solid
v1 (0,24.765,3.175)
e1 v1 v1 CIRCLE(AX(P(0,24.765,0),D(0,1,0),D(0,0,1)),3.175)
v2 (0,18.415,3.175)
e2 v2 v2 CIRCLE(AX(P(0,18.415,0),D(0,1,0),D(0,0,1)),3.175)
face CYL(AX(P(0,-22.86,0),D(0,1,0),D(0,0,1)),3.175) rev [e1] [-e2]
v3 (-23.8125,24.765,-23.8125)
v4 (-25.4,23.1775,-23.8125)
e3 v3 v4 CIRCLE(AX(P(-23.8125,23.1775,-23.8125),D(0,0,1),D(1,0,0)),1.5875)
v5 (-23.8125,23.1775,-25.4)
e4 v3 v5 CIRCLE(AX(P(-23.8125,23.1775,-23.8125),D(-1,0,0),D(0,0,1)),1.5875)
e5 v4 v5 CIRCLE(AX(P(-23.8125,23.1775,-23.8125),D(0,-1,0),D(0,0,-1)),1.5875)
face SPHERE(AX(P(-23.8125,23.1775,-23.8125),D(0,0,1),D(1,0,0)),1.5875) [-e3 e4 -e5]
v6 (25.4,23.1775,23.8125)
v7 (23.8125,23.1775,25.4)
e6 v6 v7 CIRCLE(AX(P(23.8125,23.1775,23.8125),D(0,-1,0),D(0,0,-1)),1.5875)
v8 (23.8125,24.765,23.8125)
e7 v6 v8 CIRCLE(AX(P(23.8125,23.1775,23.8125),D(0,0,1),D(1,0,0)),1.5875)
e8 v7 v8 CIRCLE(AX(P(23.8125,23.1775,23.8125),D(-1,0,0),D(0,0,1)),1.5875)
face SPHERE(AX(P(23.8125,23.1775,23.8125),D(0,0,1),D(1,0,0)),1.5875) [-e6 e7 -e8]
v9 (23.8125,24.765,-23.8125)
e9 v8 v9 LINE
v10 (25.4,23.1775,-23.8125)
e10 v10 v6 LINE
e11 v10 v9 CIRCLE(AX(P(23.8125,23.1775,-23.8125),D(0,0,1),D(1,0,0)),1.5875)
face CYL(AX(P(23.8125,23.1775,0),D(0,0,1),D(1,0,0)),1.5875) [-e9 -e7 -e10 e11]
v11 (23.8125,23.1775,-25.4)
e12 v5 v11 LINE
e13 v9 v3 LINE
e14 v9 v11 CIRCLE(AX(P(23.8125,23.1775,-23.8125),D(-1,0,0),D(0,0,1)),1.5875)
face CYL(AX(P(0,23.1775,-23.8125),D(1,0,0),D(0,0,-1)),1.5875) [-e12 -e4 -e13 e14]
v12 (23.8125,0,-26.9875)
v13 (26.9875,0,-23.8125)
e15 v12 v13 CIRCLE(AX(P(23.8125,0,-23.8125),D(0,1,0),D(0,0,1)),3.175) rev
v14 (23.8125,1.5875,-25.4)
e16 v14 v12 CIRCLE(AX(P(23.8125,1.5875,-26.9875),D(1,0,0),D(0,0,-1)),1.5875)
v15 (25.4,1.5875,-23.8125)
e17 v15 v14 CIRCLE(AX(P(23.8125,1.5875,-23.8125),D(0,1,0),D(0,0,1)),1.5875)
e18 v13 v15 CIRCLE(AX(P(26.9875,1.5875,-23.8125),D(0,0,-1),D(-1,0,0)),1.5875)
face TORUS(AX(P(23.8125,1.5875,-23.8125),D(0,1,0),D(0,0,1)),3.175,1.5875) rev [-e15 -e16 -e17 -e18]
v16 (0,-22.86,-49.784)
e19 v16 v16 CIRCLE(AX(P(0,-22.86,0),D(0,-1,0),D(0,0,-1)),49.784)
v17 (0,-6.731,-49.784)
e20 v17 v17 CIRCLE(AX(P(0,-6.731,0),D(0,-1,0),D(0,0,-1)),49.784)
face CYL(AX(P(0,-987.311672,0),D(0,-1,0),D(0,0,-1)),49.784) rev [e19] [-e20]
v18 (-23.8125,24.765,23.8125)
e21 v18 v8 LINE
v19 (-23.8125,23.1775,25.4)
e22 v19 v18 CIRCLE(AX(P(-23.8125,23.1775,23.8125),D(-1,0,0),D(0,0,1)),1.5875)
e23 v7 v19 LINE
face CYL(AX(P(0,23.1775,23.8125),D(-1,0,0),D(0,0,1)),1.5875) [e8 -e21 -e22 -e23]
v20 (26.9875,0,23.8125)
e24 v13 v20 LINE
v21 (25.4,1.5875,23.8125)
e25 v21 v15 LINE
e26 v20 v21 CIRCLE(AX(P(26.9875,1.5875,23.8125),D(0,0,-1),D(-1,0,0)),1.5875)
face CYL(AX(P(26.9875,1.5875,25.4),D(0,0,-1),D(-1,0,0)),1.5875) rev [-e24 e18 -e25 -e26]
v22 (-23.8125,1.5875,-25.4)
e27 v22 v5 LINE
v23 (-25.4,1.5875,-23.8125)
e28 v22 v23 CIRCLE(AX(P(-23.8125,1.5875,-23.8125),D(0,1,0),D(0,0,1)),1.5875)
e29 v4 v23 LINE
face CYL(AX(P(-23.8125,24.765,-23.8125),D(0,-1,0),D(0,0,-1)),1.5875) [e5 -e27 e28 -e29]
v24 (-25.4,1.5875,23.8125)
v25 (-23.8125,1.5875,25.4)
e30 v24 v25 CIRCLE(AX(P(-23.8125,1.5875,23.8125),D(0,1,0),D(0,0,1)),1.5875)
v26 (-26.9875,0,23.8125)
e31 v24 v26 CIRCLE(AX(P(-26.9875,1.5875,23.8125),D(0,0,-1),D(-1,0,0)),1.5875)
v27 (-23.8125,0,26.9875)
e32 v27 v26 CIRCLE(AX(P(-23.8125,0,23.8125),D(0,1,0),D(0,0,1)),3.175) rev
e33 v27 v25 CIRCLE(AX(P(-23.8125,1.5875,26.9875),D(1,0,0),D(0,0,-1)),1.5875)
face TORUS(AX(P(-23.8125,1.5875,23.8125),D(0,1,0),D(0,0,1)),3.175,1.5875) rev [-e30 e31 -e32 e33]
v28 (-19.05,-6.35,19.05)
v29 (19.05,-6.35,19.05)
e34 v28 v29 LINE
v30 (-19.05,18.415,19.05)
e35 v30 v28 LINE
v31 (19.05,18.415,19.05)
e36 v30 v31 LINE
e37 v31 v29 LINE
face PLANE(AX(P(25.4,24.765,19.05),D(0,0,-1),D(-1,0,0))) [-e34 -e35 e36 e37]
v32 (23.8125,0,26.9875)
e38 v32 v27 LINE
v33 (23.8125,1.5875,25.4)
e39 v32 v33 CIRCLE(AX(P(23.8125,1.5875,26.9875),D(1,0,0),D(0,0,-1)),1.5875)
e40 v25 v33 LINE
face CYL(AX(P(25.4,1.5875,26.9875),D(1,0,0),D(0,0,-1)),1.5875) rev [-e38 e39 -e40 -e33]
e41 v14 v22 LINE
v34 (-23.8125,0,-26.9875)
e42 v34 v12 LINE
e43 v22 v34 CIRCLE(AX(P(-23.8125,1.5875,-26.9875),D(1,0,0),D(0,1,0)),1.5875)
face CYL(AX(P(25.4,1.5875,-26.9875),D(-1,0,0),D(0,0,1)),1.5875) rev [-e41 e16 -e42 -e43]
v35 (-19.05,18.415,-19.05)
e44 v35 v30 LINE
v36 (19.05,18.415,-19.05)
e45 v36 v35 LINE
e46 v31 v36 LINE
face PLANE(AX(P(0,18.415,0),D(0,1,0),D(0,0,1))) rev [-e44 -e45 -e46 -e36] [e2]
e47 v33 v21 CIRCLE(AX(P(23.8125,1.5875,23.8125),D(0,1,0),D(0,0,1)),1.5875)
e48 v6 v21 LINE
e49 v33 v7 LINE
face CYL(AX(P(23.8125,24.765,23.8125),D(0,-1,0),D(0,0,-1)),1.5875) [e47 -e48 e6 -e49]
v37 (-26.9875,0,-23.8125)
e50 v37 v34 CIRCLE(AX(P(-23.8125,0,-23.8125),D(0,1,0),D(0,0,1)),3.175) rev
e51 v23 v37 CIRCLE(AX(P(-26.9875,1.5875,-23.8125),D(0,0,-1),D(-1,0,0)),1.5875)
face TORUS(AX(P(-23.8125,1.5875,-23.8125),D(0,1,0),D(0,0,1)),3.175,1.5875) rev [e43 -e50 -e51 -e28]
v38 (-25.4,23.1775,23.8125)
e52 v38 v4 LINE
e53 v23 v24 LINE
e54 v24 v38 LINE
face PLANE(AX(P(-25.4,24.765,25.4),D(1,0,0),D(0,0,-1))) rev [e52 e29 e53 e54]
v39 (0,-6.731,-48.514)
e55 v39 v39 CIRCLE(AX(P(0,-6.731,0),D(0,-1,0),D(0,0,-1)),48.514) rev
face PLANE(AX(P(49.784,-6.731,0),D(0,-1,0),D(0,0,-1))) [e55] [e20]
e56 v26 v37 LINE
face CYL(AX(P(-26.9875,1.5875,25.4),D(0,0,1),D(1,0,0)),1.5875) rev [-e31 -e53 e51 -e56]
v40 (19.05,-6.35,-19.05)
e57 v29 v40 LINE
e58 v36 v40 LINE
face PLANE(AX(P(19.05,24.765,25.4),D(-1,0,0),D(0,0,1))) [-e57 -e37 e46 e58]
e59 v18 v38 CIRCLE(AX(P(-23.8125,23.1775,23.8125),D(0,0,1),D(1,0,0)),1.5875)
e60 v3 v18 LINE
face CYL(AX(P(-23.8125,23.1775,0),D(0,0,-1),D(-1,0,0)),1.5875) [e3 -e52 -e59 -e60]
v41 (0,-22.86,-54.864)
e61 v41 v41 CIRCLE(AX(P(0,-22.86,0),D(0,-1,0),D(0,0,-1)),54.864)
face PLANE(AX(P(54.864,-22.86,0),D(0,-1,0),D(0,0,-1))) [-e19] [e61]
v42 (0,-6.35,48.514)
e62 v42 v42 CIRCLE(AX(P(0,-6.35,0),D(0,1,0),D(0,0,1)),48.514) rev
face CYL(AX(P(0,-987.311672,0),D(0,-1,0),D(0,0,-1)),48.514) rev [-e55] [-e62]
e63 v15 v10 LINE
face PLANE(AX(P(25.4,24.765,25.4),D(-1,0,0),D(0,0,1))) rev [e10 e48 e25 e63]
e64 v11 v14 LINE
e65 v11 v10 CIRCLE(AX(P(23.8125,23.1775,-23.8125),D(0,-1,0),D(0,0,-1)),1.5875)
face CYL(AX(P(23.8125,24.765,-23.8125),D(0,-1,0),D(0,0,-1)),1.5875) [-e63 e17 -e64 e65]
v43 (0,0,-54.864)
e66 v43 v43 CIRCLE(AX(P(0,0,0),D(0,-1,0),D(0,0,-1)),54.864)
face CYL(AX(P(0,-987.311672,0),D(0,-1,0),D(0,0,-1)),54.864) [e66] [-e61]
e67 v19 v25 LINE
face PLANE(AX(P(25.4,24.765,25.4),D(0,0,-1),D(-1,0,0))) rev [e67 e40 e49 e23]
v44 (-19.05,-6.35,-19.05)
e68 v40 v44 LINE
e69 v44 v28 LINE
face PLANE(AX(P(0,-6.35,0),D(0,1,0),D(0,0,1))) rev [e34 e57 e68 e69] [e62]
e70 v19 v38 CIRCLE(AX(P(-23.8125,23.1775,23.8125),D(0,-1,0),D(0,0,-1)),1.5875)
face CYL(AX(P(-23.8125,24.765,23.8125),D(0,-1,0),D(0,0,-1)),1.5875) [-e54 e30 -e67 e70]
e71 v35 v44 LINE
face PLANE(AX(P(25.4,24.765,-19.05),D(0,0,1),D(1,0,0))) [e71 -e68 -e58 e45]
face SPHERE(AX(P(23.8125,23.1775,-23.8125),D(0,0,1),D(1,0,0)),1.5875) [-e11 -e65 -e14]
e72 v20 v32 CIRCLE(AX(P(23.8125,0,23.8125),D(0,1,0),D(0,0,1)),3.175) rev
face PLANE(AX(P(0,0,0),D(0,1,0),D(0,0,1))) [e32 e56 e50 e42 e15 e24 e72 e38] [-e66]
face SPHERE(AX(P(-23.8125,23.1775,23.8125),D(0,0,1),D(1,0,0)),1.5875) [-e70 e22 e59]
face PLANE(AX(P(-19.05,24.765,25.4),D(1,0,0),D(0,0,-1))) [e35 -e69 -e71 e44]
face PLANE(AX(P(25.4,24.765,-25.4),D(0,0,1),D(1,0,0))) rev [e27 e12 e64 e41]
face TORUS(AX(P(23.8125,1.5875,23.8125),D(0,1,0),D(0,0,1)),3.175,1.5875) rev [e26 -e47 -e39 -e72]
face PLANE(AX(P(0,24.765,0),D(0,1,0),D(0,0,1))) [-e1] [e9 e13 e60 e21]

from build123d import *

# Parameters (mm, degrees)
SKETCH2_W               = 50.8
SKETCH2_H               = 50.8
BOSS_EXTRUDE1_DEPTH     = 24.765
SHELL1_START            = -6.731
SHELL1_OUTLINE_W        = 38.1
SHELL1_OUTLINE_H        = 38.1
SHELL1_DEPTH            = 25.146
SHELL1_2_OUTLINE_R      = 48.514
SHELL1_2_OUTLINE_W      = 38.1
SHELL1_2_OUTLINE_H      = 38.1
SHELL1_2_DEPTH          = 0.381
FILLET1_R               = 1.5875
FILLET2_R               = 1.5875
CUT_EXTRUDE1_DEPTH      = 82.445823816
CUT_EXTRUDE1_DEPTH_BACK = 82.445823816
SKETCH3_R               = 3.175


# Read off the part's stored shape, not the designer's step: Shell1
with BuildPart() as part:
    # Sketch1 → Revolve1 (revolve)
    with BuildSketch(Plane.XY, mode=Mode.PRIVATE) as revolve1_sk:
        Polygon((0, 0), (54.864, 0), (54.864, -22.86), (49.784, -22.86), (49.784, -6.731), (0, -6.731), align=None)
    revolve(revolve1_sk.sketch.rotate(Axis((0, -987.311672366, 0), (0, 1, 0)), 90), axis=Axis((0, -987.311672366, 0), (0, 1, 0)))

    # Sketch2 → Boss-Extrude1 (add)
    with BuildSketch(Plane(origin=(0, 0, 0), x_dir=(1, 0, 0), z_dir=(0, 1, 0))):
        Rectangle(SKETCH2_W, SKETCH2_H)
    extrude(amount=BOSS_EXTRUDE1_DEPTH)

    # Shell1 outline → Shell1 (cut)
    with BuildSketch(Plane(origin=(0, 0, 0), x_dir=(1, 0, 0), z_dir=(0, 1, 0)).offset(SHELL1_START)):
        Rectangle(SHELL1_OUTLINE_W, SHELL1_OUTLINE_H)
    extrude(amount=SHELL1_DEPTH, mode=Mode.SUBTRACT)

    # Shell1 2 outline → Shell1 2 (cut)
    with BuildSketch(Plane(origin=(0, 0, 0), x_dir=(1, 0, 0), z_dir=(0, 1, 0)).offset(SHELL1_START)):
        Circle(SHELL1_2_OUTLINE_R)
        Rectangle(SHELL1_2_OUTLINE_W, SHELL1_2_OUTLINE_H, mode=Mode.SUBTRACT)
    extrude(amount=SHELL1_2_DEPTH, mode=Mode.SUBTRACT)

    # Fillet1
    fillet1_edges = [part.edges().sort_by_distance(p)[0] for p in [
        (-25.4, 12.3825, -25.4),
        (-25.4, 12.3825, 25.4),
        (25.4, 12.3825, 25.4),
        (25.4, 12.3825, -25.4),
    ]]
    fillet(fillet1_edges, radius=FILLET1_R)

    # Fillet2
    fillet2_edges = [part.edges().sort_by_distance(p)[0] for p in [
        (0, 0, -25.4),
        (0, 24.765, -25.4),
        (25.4, 0, 0),
        (25.4, 24.765, 0),
        (-25.4, 24.765, 0),
        (0, 24.765, 25.4),
        (-24.935032015, 24.765, -24.935032015),
        (-24.935032015, 24.765, 24.935032015),
        (24.935032015, 24.765, 24.935032015),
        (24.935032015, 24.765, -24.935032015),
        (0, 0, 25.4),
        (-25.4, 0, 0),
        (24.935032015, 0, -24.935032015),
        (24.935032015, 0, 24.935032015),
        (-24.935032015, 0, 24.935032015),
        (-24.935032015, 0, -24.935032015),
    ]]
    fillet(fillet2_edges, radius=FILLET2_R)

    # Sketch3 → Cut-Extrude1 (cut, two sides: drawn at the far end of the back side and taken through both)
    with BuildSketch(Plane(origin=(0, 0, 0), x_dir=(1, 0, 0), z_dir=(0, 1, 0)).offset(-CUT_EXTRUDE1_DEPTH_BACK)):
        with Locations(Location((0, 0, 0), (0, 0, 270))):
            Circle(SKETCH3_R)
    extrude(amount=CUT_EXTRUDE1_DEPTH + CUT_EXTRUDE1_DEPTH_BACK, mode=Mode.SUBTRACT)


solid = part.part
